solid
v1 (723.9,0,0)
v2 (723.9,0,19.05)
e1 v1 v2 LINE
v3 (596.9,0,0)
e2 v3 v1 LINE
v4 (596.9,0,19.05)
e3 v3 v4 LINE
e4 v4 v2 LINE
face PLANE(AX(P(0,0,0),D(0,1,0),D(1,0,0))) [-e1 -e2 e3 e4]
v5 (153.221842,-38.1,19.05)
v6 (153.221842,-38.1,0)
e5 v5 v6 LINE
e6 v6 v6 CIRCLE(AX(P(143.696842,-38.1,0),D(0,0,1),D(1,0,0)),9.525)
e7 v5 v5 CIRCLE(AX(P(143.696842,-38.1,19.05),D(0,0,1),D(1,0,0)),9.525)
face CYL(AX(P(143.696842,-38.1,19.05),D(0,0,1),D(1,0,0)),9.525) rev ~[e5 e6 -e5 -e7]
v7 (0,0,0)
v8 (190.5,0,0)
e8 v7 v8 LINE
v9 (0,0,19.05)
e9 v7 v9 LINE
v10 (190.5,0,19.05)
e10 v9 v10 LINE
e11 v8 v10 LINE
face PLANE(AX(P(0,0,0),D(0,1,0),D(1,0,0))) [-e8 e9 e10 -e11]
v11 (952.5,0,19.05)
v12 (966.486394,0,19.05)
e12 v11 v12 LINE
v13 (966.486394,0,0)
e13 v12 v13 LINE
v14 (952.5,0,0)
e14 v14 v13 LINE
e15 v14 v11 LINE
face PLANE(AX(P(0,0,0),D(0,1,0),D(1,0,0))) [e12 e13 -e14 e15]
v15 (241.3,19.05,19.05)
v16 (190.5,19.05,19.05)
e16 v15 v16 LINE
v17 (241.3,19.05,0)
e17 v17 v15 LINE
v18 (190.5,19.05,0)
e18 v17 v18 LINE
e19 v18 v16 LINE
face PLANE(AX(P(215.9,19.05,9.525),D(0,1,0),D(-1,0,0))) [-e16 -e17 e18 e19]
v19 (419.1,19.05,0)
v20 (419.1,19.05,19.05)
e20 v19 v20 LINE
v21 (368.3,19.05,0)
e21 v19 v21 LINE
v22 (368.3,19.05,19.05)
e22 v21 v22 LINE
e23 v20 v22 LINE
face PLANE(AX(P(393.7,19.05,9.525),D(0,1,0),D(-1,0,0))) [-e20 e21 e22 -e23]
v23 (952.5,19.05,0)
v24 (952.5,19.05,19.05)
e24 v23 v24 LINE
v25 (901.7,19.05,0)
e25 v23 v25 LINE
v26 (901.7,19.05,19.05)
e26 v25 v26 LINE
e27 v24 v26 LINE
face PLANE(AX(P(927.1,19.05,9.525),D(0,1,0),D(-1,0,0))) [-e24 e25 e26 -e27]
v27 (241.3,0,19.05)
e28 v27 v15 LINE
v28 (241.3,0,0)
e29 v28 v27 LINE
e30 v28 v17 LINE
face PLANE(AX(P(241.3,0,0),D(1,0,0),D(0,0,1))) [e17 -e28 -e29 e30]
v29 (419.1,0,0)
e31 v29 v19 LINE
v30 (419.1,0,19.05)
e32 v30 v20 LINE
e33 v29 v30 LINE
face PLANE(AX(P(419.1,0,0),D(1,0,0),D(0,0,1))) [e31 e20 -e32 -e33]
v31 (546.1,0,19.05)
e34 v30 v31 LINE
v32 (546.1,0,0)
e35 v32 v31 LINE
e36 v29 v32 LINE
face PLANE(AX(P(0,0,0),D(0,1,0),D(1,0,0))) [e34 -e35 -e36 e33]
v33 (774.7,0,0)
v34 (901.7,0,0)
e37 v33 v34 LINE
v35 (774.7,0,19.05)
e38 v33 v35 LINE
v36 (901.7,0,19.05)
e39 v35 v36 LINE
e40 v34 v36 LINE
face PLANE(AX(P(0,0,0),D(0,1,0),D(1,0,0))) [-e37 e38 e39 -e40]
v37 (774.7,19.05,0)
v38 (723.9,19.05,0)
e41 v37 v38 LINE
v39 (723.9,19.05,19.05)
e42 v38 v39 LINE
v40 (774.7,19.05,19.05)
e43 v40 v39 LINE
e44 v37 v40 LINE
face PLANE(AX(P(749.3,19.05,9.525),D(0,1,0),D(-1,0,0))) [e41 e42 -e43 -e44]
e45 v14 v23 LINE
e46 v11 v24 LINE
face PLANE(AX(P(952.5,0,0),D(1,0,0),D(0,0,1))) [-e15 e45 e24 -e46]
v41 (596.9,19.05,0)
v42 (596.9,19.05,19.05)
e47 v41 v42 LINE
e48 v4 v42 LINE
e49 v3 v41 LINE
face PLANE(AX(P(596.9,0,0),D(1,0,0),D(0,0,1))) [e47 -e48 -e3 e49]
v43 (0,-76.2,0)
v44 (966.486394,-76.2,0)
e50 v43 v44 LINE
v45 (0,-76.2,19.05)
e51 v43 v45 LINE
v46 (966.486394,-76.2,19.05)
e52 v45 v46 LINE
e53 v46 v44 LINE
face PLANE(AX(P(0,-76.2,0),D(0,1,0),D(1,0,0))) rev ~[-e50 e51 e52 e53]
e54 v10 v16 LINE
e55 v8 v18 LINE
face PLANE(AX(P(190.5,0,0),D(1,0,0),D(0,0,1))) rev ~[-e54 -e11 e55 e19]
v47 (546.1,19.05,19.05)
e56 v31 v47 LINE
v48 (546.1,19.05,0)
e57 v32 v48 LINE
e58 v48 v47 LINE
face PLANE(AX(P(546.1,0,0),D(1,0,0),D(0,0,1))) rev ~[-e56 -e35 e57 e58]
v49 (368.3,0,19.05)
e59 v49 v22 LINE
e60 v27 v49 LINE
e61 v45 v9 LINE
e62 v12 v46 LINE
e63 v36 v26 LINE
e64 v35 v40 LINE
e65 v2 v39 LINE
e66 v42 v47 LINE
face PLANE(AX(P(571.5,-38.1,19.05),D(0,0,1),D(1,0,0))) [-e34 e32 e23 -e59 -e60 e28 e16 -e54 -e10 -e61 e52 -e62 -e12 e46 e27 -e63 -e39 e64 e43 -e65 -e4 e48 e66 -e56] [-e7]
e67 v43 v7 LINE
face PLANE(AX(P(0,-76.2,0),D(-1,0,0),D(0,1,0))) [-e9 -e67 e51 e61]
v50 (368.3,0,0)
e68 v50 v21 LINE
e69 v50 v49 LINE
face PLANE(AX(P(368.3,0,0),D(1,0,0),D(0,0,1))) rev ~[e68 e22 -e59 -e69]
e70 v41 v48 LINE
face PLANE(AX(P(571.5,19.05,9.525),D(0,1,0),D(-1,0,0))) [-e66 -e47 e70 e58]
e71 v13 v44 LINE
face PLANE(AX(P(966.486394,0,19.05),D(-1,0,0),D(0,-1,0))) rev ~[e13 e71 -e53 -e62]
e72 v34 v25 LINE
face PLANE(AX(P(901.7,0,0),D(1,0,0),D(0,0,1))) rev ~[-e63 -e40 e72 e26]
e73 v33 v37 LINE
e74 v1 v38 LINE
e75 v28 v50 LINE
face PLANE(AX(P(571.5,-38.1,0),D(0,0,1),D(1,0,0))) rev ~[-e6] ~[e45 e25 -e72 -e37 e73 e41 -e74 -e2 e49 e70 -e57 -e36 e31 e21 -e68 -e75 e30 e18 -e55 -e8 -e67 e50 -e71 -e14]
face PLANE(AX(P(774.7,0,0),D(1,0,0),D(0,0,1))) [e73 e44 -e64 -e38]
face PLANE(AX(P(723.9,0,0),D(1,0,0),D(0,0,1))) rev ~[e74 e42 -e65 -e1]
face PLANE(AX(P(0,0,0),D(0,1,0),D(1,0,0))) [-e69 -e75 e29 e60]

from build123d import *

# Parameters (mm, degrees)
F0_W     = 1143
F0_H     = 76.2
F1_DEPTH = 19.05
F2_W     = 50.8
F2_H     = 19.05
F3_DEPTH = 19.05
F4_R     = 9.525
F5_DEPTH = 19.05
F6_W     = 22.86
F6_H     = 15.875
F7_DEPTH = 25.4
F9_DEPTH = 25.4


# Not quite as in the source:
# - a length typed as a fraction of an inch, garbled in the dataset ("3 / 203.2 mm" for 3/8 in), is restored
# - a feature names something its author has since deleted; it is built from what else it names


with BuildPart() as f1:
    # F0 (on Top) → F1 (new body)
    with BuildSketch(Plane.XY):
        with Locations((571.5, -38.1)):
            Rectangle(F0_W, F0_H)
    extrude(amount=F1_DEPTH)

    # F2 (on face) → F3 (join)
    with BuildSketch(Plane(origin=(0, 0, 0), x_dir=(-1, 0, 0), z_dir=(0, 1, 0))):
        with Locations((-927.1, 9.525)):
            Rectangle(F2_W, F2_H)
        with Locations((-749.3, 9.525)):
            Rectangle(F2_W, F2_H)
        with Locations((-571.5, 9.525)):
            Rectangle(F2_W, F2_H)
        with Locations((-393.7, 9.525)):
            Rectangle(F2_W, F2_H)
        with Locations((-215.9, 9.525)):
            Rectangle(F2_W, F2_H)
    extrude(amount=F3_DEPTH)

    # F4 (on face) → F5 (cut)
    with BuildSketch(Plane.XY.offset(19.05)):
        with Locations((143.6968424, -38.1)):
            Circle(F4_R)
    extrude(amount=-F5_DEPTH, mode=Mode.SUBTRACT)

    # F6 (on face) → F7 (cut)
    with BuildSketch(Plane.XY.offset(19.05)):
        with Locations((1047.75, -7.9375)):
            Rectangle(F6_W, F6_H)
    extrude(amount=-F7_DEPTH, mode=Mode.SUBTRACT)

    # F8 (on face) → F9 (cut)
    with BuildSketch(Plane.XY.offset(19.05)):
        Polygon((1036.32, 0), (966.4863944054, 0), (966.4863944054, -76.2), (1143, -76.2), (1143, 0), (1059.18, 0), (1059.18, -15.875), (1036.32, -15.875), align=None)
    extrude(amount=-F9_DEPTH, mode=Mode.SUBTRACT)


solid = f1.part
